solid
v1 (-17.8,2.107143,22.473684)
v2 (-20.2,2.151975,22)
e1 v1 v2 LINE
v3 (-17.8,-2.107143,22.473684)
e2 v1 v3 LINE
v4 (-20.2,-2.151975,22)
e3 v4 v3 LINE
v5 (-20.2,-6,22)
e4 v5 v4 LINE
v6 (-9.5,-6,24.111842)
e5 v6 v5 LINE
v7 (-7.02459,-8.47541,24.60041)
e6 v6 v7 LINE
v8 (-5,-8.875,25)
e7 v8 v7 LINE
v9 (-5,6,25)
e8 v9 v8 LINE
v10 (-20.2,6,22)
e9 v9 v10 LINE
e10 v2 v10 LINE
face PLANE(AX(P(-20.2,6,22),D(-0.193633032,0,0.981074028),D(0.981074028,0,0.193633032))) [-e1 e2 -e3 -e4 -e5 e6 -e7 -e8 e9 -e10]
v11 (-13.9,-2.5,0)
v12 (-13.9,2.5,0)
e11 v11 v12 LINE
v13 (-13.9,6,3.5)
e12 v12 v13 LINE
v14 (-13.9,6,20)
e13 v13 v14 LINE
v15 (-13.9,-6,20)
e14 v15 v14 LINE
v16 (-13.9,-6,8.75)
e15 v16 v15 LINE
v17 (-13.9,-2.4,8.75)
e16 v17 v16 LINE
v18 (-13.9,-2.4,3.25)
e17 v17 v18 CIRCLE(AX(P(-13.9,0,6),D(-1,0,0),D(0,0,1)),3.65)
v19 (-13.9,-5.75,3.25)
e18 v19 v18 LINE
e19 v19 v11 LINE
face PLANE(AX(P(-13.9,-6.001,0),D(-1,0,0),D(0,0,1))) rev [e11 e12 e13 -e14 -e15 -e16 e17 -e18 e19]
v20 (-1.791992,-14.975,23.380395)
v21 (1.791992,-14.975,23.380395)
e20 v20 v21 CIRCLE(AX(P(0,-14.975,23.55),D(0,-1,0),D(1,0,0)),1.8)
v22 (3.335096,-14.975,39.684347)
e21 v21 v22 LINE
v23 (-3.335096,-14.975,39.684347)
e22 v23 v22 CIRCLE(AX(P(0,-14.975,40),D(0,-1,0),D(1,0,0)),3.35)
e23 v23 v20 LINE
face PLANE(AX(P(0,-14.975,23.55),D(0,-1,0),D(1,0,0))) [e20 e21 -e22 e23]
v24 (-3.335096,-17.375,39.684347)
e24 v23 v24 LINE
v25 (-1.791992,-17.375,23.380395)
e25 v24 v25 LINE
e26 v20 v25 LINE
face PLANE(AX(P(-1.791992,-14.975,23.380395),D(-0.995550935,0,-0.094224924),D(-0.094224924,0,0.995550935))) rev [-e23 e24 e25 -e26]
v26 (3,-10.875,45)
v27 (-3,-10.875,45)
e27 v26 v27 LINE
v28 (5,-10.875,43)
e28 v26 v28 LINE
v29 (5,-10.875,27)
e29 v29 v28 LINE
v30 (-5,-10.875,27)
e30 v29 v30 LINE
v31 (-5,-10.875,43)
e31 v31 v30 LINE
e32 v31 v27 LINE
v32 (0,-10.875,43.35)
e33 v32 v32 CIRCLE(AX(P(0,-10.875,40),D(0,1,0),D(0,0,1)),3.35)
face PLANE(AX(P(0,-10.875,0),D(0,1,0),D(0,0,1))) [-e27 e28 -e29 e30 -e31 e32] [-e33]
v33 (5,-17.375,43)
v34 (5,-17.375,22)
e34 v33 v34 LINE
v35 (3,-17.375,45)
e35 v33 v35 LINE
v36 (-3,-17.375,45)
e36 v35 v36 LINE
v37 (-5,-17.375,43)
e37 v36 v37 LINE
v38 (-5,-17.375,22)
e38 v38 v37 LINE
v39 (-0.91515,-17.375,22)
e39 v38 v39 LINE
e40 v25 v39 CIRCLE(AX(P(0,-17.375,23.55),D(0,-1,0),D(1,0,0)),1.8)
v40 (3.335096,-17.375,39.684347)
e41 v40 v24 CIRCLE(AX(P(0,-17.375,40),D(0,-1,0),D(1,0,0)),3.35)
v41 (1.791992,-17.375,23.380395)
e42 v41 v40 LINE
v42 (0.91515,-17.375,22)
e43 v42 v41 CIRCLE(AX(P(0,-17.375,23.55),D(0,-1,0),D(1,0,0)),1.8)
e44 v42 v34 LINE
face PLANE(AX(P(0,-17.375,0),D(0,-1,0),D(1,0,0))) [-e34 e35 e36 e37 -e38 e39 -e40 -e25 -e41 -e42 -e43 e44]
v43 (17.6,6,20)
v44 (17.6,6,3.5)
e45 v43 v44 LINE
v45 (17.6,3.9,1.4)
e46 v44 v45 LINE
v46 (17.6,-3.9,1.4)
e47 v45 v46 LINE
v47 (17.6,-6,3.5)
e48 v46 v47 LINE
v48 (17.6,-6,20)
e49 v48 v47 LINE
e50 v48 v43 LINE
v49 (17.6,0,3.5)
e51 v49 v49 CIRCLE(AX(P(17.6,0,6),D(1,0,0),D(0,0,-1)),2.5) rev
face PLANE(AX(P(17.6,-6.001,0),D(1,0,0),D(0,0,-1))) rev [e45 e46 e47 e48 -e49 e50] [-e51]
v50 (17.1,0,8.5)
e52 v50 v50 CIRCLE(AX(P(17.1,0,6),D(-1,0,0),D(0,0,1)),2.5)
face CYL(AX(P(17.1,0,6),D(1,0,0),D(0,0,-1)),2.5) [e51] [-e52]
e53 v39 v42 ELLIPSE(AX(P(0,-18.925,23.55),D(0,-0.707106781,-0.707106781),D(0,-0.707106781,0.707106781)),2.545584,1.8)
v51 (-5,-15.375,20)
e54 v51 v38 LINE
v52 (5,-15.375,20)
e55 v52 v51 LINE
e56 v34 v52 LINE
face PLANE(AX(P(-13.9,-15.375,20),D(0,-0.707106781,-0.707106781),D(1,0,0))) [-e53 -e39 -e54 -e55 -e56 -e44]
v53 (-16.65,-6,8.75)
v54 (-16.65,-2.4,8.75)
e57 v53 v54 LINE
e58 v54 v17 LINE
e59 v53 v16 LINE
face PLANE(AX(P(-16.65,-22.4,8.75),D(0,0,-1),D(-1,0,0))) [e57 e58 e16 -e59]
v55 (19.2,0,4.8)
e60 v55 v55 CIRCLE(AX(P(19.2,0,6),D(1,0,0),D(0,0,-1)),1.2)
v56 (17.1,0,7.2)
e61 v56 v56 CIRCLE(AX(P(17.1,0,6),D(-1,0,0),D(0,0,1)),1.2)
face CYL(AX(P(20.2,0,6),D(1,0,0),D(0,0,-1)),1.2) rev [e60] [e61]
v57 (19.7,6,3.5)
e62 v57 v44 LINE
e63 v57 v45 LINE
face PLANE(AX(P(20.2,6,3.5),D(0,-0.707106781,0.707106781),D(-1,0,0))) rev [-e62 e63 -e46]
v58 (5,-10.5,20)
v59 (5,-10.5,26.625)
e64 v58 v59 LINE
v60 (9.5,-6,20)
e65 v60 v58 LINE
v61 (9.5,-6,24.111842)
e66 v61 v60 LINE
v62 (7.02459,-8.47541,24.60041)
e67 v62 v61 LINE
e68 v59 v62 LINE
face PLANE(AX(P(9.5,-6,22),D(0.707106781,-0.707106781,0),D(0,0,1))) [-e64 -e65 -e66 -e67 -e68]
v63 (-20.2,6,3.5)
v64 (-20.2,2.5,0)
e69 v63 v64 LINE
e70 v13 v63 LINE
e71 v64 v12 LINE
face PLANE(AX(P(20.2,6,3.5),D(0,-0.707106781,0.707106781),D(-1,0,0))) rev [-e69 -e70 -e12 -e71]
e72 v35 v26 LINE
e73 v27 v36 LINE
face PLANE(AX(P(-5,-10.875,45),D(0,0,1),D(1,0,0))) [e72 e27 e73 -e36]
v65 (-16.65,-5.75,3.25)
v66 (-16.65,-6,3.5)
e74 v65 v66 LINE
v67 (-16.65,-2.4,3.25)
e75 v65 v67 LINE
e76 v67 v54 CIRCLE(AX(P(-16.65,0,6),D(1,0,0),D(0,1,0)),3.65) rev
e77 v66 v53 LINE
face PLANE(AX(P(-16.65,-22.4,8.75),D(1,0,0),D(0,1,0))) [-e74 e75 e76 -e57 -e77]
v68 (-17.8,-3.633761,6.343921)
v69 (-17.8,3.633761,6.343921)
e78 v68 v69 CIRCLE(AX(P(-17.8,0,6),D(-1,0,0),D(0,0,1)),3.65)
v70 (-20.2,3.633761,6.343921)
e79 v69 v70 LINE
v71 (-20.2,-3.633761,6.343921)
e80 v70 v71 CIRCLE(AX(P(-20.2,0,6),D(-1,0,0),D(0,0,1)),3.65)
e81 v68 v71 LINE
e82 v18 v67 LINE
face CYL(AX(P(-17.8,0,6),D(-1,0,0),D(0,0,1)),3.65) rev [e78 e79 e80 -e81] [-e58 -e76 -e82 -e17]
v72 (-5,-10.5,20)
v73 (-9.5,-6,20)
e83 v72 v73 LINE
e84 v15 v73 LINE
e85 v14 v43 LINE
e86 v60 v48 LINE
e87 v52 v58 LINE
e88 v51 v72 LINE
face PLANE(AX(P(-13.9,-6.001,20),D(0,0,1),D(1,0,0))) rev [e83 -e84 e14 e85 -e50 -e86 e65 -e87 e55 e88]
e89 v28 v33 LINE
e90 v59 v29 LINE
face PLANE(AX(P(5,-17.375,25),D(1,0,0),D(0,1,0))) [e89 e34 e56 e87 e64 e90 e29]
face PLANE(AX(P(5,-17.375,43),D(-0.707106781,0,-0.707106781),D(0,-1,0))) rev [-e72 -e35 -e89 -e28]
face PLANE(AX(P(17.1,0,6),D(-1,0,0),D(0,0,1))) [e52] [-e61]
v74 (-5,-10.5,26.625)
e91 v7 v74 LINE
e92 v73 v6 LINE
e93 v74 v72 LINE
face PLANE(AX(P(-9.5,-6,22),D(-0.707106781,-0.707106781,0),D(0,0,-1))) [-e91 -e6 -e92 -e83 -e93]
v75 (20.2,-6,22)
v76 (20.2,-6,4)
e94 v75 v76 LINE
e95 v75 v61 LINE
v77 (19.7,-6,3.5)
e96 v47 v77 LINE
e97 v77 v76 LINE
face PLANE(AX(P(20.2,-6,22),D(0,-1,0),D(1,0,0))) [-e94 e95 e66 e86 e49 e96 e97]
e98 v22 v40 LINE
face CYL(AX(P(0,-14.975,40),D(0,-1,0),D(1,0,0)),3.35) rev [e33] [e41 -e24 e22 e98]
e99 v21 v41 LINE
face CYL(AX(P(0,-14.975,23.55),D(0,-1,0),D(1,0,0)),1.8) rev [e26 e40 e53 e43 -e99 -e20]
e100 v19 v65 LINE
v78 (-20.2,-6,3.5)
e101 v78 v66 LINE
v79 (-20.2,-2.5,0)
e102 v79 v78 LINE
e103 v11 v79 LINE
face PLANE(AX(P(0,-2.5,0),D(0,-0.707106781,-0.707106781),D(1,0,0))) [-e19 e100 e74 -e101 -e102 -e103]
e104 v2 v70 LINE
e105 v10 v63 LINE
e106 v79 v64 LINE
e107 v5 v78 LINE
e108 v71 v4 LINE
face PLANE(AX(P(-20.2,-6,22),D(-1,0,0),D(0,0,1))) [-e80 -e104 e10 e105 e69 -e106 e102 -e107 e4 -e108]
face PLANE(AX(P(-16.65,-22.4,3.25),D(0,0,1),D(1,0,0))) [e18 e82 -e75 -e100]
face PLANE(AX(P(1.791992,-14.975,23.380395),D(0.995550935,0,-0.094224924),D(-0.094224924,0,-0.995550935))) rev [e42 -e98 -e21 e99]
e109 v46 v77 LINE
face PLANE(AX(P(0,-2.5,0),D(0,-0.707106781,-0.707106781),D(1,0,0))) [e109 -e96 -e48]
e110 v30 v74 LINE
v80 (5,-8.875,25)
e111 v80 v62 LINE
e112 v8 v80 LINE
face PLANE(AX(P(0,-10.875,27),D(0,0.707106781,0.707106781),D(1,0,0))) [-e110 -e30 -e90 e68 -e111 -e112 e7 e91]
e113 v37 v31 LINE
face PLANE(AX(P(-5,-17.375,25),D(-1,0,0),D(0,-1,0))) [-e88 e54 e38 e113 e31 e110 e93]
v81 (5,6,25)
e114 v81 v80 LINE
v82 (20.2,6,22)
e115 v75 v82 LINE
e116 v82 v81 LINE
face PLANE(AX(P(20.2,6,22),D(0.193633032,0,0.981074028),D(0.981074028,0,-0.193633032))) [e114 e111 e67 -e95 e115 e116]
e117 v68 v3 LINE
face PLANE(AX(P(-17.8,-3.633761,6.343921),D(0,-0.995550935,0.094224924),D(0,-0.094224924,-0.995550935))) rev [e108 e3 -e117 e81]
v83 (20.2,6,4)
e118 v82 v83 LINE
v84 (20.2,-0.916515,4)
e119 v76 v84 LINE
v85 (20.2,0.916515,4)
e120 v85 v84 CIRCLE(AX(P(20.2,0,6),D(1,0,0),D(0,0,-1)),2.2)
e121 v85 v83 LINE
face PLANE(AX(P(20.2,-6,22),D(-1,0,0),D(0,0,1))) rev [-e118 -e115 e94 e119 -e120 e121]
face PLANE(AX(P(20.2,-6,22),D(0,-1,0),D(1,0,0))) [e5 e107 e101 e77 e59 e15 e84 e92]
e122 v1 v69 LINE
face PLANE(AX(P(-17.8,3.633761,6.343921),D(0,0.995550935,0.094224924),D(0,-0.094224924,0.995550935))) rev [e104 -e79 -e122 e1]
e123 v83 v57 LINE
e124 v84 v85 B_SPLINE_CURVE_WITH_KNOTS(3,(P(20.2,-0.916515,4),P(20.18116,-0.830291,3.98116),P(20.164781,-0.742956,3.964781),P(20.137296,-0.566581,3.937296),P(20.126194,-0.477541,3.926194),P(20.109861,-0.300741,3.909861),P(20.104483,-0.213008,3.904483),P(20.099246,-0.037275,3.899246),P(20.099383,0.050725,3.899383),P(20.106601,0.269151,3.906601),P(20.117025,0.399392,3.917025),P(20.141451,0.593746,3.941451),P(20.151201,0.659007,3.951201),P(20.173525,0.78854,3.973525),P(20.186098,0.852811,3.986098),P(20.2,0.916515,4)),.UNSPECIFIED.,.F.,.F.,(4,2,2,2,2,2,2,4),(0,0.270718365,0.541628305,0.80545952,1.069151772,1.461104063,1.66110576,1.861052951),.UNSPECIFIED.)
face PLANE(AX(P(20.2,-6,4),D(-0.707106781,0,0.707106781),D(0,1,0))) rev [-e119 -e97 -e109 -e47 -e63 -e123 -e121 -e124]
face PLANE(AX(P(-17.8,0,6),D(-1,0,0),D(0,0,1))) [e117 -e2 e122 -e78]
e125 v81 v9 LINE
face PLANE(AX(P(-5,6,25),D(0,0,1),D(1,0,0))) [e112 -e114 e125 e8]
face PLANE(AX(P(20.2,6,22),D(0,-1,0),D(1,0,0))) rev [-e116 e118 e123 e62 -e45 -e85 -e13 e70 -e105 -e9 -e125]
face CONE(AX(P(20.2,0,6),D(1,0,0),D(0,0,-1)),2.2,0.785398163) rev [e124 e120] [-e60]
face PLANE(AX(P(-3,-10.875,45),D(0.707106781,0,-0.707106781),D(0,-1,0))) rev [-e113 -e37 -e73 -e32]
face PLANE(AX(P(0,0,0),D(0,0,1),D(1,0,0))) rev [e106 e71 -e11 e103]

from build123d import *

# Parameters (mm, degrees)
SKETCH1_W                                       = 40.4
SKETCH1_H                                       = 12
BOSS_EXTRUDE1_DEPTH                             = 22
CUT_EXTRUDE1_REACH                              = 34.188
SKETCH2_W                                       = 31.5
SKETCH2_H                                       = 20
CUT_EXTRUDE2_REACH                              = 48.391
SKETCH4_R                                       = 0.9
CHAMFER1_SIZE                                   = 3.5
CSK_FOR_M2_FLAT_HEAD_MACHINE_SCREW1_D           = 2.4
CSK_FOR_M2_FLAT_HEAD_MACHINE_SCREW1_DEPTH       = 12.7
CSK_FOR_M2_FLAT_HEAD_MACHINE_SCREW1_CSINK_D     = 4.4
CSK_FOR_M2_FLAT_HEAD_MACHINE_SCREW1_CSINK_ANGLE = 90
CSK_FOR_M2_FLAT_HEAD_MACHINE_SCREW1_TIP         = 0.721032743
CHAMFER2_SIZE                                   = 4
BOSS_EXTRUDE2_START                             = 0.5
SKETCH20_R                                      = 2.5
SKETCH20_R_2                                    = 1.2
BOSS_EXTRUDE2_DEPTH                             = 0.5
BOSS_EXTRUDE3_DEPTH                             = 12
CUT_EXTRUDE3_DEPTH                              = 2.4
SKETCH23_R                                      = 3.65
CUT_EXTRUDE4_DEPTH                              = 22.4
SKETCH24_W                                      = 5.5
SKETCH24_H                                      = 5.5
CUT_EXTRUDE5_DEPTH                              = 22.4
SKETCH26_W                                      = 10
SKETCH26_H                                      = 5
BOSS_EXTRUDE4_DEPTH                             = 11.375
SKETCH27_W                                      = 10
SKETCH27_H                                      = 25
BOSS_EXTRUDE5_DEPTH                             = 6.5
CUT_EXTRUDE6_DEPTH                              = 2.4
SKETCH29_R                                      = 3.35
CUT_EXTRUDE7_DEPTH                              = 54.60028568
CHAMFER3_SIZE                                   = 2
CHAMFER5_SIZE                                   = 2
CHAMFER6_SIZE                                   = 4.5


with BuildPart() as part:
    # Sketch1 → Boss-Extrude1 (new body)
    with BuildSketch(Plane.XY):
        Rectangle(SKETCH1_W, SKETCH1_H)
    extrude(amount=BOSS_EXTRUDE1_DEPTH)

    # Sketch2 → Cut-Extrude1 (cut, up to next)
    with BuildSketch(Plane(origin=(0, 6, 0), x_dir=(1, 0, 0), z_dir=(0, 1, 0)), mode=Mode.PRIVATE) as cut_extrude1_sk1:
        with Locations((1.85, -10)):
            Rectangle(SKETCH2_W, SKETCH2_H)
    cut_extrude1_tool1 = extrude(cut_extrude1_sk1.sketch, amount=-CUT_EXTRUDE1_REACH, mode=Mode.PRIVATE) & part.part
    add(cut_extrude1_tool1.solids().sort_by_distance((1.85, 6, 10))[0], mode=Mode.SUBTRACT)

    # Sketch4 → Cut-Extrude2 (cut, up to next)
    with BuildSketch(Plane(origin=(20.2, 0, 0), x_dir=(0, 0, -1), z_dir=(1, 0, 0)), mode=Mode.PRIVATE) as cut_extrude2_sk1:
        with Locations((-6, 0)):
            Circle(SKETCH4_R)
    cut_extrude2_tool1 = extrude(cut_extrude2_sk1.sketch, amount=-CUT_EXTRUDE2_REACH, mode=Mode.PRIVATE) & part.part
    add(cut_extrude2_tool1.solids().sort_by_distance((20.2, 0, 6))[0], mode=Mode.SUBTRACT)

    # Chamfer1
    chamfer1_edges = [part.edges().sort_by_distance(p)[0] for p in [
        (-17.05, -6, 0),
        (-17.05, 6, 0),
        (18.9, -6, 0),
        (18.9, 6, 0),
    ]]
    chamfer(chamfer1_edges, length=CHAMFER1_SIZE)

    # CSK for M2 Flat Head Machine Screw1
    with Locations(Plane(origin=(20.2, 0, 0), x_dir=(0, 0, -1), z_dir=(1, 0, 0))):
        with Locations((-6, 0)):
            CounterSinkHole(CSK_FOR_M2_FLAT_HEAD_MACHINE_SCREW1_D / 2, CSK_FOR_M2_FLAT_HEAD_MACHINE_SCREW1_CSINK_D / 2, depth=CSK_FOR_M2_FLAT_HEAD_MACHINE_SCREW1_DEPTH, counter_sink_angle=CSK_FOR_M2_FLAT_HEAD_MACHINE_SCREW1_CSINK_ANGLE)
            with Locations((0, 0, -(CSK_FOR_M2_FLAT_HEAD_MACHINE_SCREW1_DEPTH + CSK_FOR_M2_FLAT_HEAD_MACHINE_SCREW1_TIP / 2))):  # 118° drill point
                Cone(0, CSK_FOR_M2_FLAT_HEAD_MACHINE_SCREW1_D / 2, CSK_FOR_M2_FLAT_HEAD_MACHINE_SCREW1_TIP, mode=Mode.SUBTRACT)

    # Chamfer2
    # the kernel refuses this chamfer: 4 mm, written as the material it takes off along each edge
    with BuildSketch(Plane(origin=(20.2, 12.786731952, 0), x_dir=(-0.9996219169112968, 0, -0.027495876610586365), z_dir=(0, -1, 0))) as chamfer2_piece_1:
        Polygon((CHAMFER2_SIZE * 0.999621916911, -CHAMFER2_SIZE * 0.0274958766106), (-CHAMFER2_SIZE * 0.0274958766106, -CHAMFER2_SIZE * 0.999621916911), (0, 0), align=None)
    extrude(amount=25.573463904, mode=Mode.SUBTRACT)

    # Sketch20 → Boss-Extrude2 (add)
    with BuildSketch(Plane.ZY.offset(-17.6).offset(BOSS_EXTRUDE2_START)):
        with Locations(Location((6, 0, 0), (0, 0, 180))):
            Circle(SKETCH20_R)
        with Locations(Location((6, 0, 0), (0, 0, 180))):
            Circle(SKETCH20_R_2, mode=Mode.SUBTRACT)
    extrude(amount=-BOSS_EXTRUDE2_DEPTH)

    # Sketch25 → Boss-Extrude3 (add, through all)
    with BuildSketch(Plane.XZ.offset(6)):
        Polygon((20.2, 22), (-20.2, 22), (-5, 25), (5, 25), align=None)
    extrude(amount=-BOSS_EXTRUDE3_DEPTH)

    # Sketch5 → Cut-Extrude3 (cut)
    with BuildSketch(Plane.ZY.offset(20.2)):
        with BuildLine():
            Line((6.343920973, 3.633760912), (22.64787234, 2.090656963))
            ThreePointArc((22.64787234, 2.090656963), (24.55, 0), (22.64787234, -2.090656963))
            Line((22.64787234, -2.090656963), (6.343920973, -3.633760912))
            ThreePointArc((6.343920973, -3.633760912), (2.35, 0), (6.343920973, 3.633760912))
        make_face()
    extrude(amount=-CUT_EXTRUDE3_DEPTH, mode=Mode.SUBTRACT)

    # Sketch23 → Cut-Extrude4 (cut)
    with BuildSketch(Plane.ZY.offset(17.8)):
        with Locations((6, 0)):
            Circle(SKETCH23_R)
    extrude(amount=-CUT_EXTRUDE4_DEPTH, mode=Mode.SUBTRACT)

    # Sketch24 → Cut-Extrude5 (cut)
    with BuildSketch(Plane(origin=(0, 0, 0), x_dir=(-1, 0, 0), z_dir=(0, -1, 0))):
        with Locations((13.9, -6)):
            Rectangle(SKETCH24_W, SKETCH24_H)
    extrude(amount=CUT_EXTRUDE5_DEPTH, mode=Mode.SUBTRACT)

    # Sketch26 → Boss-Extrude4 (add)
    with BuildSketch(Plane(origin=(0, -6, 0), x_dir=(1, 0, 0), z_dir=(0, 1, 0))):
        with Locations((0, -22.5)):
            Rectangle(SKETCH26_W, SKETCH26_H)
    extrude(amount=-BOSS_EXTRUDE4_DEPTH)

    # Sketch27 → Boss-Extrude5 (add)
    with BuildSketch(Plane(origin=(0, -17.375, 0), x_dir=(-1, 0, 0), z_dir=(0, -1, 0))):
        with Locations((0, -32.5)):
            Rectangle(SKETCH27_W, SKETCH27_H)
    extrude(amount=-BOSS_EXTRUDE5_DEPTH)

    # Sketch28 → Cut-Extrude6 (cut)
    with BuildSketch(Plane(origin=(0, -17.375, 0), x_dir=(-1, 0, 0), z_dir=(0, -1, 0))):
        with BuildLine():
            Line((-1.791991683, -23.380395137), (-3.335095631, -39.684346505))
            ThreePointArc((-3.335095631, -39.684346505), (0, -43.35), (3.335095631, -39.684346505))
            Line((3.335095631, -39.684346505), (1.791991683, -23.380395137))
            ThreePointArc((1.791991683, -23.380395137), (0, -21.75), (-1.791991683, -23.380395137))
        make_face()
    extrude(amount=-CUT_EXTRUDE6_DEPTH, mode=Mode.SUBTRACT)

    # Sketch29 → Cut-Extrude7 (cut, through all)
    with BuildSketch(Plane(origin=(0, -14.975, 0), x_dir=(-1, 0, 0), z_dir=(0, -1, 0))):
        with Locations(Location((0, -40, 0), (0, 0, 174.593288878))):
            Circle(SKETCH29_R)
    extrude(amount=-CUT_EXTRUDE7_DEPTH, mode=Mode.SUBTRACT)

    # Chamfer3
    # the kernel refuses this chamfer: 2 mm, written as the material it takes off along each edge
    with BuildSketch(Plane(origin=(10.143365976, -17.375, 20), x_dir=(0, 0.9996219169112968, -0.0274958766105856), z_dir=(-1, 0, 0))) as chamfer3_piece_1:
        Polygon((CHAMFER3_SIZE * 0.999621916911, -CHAMFER3_SIZE * 0.0274958766106), (-CHAMFER3_SIZE * 0.0274958766106, -CHAMFER3_SIZE * 0.999621916911), (0, 0), align=None)
    extrude(amount=20.286731952, mode=Mode.SUBTRACT)
    with BuildSketch(Plane(origin=(-5, -22.518365976, 45), x_dir=(-0.02749587661058651, 0, -0.9996219169112968), z_dir=(0, 1, 0))) as chamfer3_piece_2:
        Polygon((CHAMFER3_SIZE * 0.999621916911, -CHAMFER3_SIZE * 0.0274958766106), (-CHAMFER3_SIZE * 0.0274958766106, -CHAMFER3_SIZE * 0.999621916911), (0, 0), align=None)
    extrude(amount=16.786731952, mode=Mode.SUBTRACT)
    with BuildSketch(Plane(origin=(5, -22.518365976, 45), x_dir=(0.02749587661058651, 0, -0.9996219169112968), z_dir=(0, 1, 0))) as chamfer3_piece_3:
        Polygon((CHAMFER3_SIZE * 0.999621916911, CHAMFER3_SIZE * 0.0274958766106), (-CHAMFER3_SIZE * 0.0274958766106, CHAMFER3_SIZE * 0.999621916911), (0, 0), align=None)
    extrude(amount=16.786731952, mode=Mode.SUBTRACT)

    # Chamfer5
    chamfer5_edges = [part.edges().sort_by_distance(p)[0] for p in [
        (0, -10.875, 25),
    ]]
    chamfer(chamfer5_edges, length=CHAMFER5_SIZE)

    # Chamfer6
    # the kernel refuses this chamfer: 4.5 mm, written as the material it adds along each edge
    with BuildSketch(Plane(origin=(-5, -6, 20), x_dir=(0.027495876610586587, -0.9996219169112966, 0), z_dir=(0, 0, 1))) as chamfer6_piece_1_section:
        Polygon((CHAMFER6_SIZE * 0.999621916911, -CHAMFER6_SIZE * 0.0274958766106), (-CHAMFER6_SIZE * 0.0274958766106, -CHAMFER6_SIZE * 0.999621916911), (0, 0), align=None)
    chamfer6_piece_1 = extrude(amount=16.572573446, mode=Mode.PRIVATE)
    chamfer6_piece_1 = split(chamfer6_piece_1, bisect_by=Plane(origin=(-6.365694547, -6.762864523, 22.887864523), z_dir=(0, -0.7071067811865476, -0.7071067811865476)), keep=Keep.TOP, mode=Mode.PRIVATE)
    add(chamfer6_piece_1)
    with BuildSketch(Plane(origin=(-5, -6, 20), x_dir=(0.027495876610586587, -0.9996219169112966, 0), z_dir=(0, 0, 1))) as chamfer6_piece_2_section:
        Polygon((CHAMFER6_SIZE * 0.999621916911, -CHAMFER6_SIZE * 0.0274958766106), (-CHAMFER6_SIZE * 0.0274958766106, -CHAMFER6_SIZE * 0.999621916911), (0, 0), align=None)
    chamfer6_piece_2 = extrude(amount=16.572573446, mode=Mode.PRIVATE)
    chamfer6_piece_2 = split(chamfer6_piece_2, bisect_by=Plane(origin=(-6.882801267, -6.788517358, 24.628394487), z_dir=(0.19363303189666034, 0, -0.9810740282764124)), keep=Keep.TOP, mode=Mode.PRIVATE)
    add(chamfer6_piece_2)
    with BuildSketch(Plane(origin=(5, -6, 36.572573446), x_dir=(-0.0274958766105862, -0.9996219169112969, 0), z_dir=(0, 0, -1))) as chamfer6_piece_3_section:
        Polygon((CHAMFER6_SIZE * 0.999621916911, -CHAMFER6_SIZE * 0.0274958766106), (-CHAMFER6_SIZE * 0.0274958766106, -CHAMFER6_SIZE * 0.999621916911), (0, 0), align=None)
    chamfer6_piece_3 = extrude(amount=16.572573446, mode=Mode.PRIVATE)
    chamfer6_piece_3 = split(chamfer6_piece_3, bisect_by=Plane(origin=(5.40625, -9.484375, 25.609375), z_dir=(0, -0.7071067811865476, -0.7071067811865476)), keep=Keep.TOP, mode=Mode.PRIVATE)
    add(chamfer6_piece_3)
    with BuildSketch(Plane(origin=(5, -6, 36.572573446), x_dir=(-0.0274958766105862, -0.9996219169112969, 0), z_dir=(0, 0, -1))) as chamfer6_piece_4_section:
        Polygon((CHAMFER6_SIZE * 0.999621916911, -CHAMFER6_SIZE * 0.0274958766106), (-CHAMFER6_SIZE * 0.0274958766106, -CHAMFER6_SIZE * 0.999621916911), (0, 0), align=None)
    chamfer6_piece_4 = extrude(amount=16.572573446, mode=Mode.PRIVATE)
    chamfer6_piece_4 = split(chamfer6_piece_4, bisect_by=Plane(origin=(6.882801267, -6.788517358, 24.628394487), z_dir=(-0.19363303189666034, 0, -0.9810740282764124)), keep=Keep.TOP, mode=Mode.PRIVATE)
    add(chamfer6_piece_4)


solid = part.part
